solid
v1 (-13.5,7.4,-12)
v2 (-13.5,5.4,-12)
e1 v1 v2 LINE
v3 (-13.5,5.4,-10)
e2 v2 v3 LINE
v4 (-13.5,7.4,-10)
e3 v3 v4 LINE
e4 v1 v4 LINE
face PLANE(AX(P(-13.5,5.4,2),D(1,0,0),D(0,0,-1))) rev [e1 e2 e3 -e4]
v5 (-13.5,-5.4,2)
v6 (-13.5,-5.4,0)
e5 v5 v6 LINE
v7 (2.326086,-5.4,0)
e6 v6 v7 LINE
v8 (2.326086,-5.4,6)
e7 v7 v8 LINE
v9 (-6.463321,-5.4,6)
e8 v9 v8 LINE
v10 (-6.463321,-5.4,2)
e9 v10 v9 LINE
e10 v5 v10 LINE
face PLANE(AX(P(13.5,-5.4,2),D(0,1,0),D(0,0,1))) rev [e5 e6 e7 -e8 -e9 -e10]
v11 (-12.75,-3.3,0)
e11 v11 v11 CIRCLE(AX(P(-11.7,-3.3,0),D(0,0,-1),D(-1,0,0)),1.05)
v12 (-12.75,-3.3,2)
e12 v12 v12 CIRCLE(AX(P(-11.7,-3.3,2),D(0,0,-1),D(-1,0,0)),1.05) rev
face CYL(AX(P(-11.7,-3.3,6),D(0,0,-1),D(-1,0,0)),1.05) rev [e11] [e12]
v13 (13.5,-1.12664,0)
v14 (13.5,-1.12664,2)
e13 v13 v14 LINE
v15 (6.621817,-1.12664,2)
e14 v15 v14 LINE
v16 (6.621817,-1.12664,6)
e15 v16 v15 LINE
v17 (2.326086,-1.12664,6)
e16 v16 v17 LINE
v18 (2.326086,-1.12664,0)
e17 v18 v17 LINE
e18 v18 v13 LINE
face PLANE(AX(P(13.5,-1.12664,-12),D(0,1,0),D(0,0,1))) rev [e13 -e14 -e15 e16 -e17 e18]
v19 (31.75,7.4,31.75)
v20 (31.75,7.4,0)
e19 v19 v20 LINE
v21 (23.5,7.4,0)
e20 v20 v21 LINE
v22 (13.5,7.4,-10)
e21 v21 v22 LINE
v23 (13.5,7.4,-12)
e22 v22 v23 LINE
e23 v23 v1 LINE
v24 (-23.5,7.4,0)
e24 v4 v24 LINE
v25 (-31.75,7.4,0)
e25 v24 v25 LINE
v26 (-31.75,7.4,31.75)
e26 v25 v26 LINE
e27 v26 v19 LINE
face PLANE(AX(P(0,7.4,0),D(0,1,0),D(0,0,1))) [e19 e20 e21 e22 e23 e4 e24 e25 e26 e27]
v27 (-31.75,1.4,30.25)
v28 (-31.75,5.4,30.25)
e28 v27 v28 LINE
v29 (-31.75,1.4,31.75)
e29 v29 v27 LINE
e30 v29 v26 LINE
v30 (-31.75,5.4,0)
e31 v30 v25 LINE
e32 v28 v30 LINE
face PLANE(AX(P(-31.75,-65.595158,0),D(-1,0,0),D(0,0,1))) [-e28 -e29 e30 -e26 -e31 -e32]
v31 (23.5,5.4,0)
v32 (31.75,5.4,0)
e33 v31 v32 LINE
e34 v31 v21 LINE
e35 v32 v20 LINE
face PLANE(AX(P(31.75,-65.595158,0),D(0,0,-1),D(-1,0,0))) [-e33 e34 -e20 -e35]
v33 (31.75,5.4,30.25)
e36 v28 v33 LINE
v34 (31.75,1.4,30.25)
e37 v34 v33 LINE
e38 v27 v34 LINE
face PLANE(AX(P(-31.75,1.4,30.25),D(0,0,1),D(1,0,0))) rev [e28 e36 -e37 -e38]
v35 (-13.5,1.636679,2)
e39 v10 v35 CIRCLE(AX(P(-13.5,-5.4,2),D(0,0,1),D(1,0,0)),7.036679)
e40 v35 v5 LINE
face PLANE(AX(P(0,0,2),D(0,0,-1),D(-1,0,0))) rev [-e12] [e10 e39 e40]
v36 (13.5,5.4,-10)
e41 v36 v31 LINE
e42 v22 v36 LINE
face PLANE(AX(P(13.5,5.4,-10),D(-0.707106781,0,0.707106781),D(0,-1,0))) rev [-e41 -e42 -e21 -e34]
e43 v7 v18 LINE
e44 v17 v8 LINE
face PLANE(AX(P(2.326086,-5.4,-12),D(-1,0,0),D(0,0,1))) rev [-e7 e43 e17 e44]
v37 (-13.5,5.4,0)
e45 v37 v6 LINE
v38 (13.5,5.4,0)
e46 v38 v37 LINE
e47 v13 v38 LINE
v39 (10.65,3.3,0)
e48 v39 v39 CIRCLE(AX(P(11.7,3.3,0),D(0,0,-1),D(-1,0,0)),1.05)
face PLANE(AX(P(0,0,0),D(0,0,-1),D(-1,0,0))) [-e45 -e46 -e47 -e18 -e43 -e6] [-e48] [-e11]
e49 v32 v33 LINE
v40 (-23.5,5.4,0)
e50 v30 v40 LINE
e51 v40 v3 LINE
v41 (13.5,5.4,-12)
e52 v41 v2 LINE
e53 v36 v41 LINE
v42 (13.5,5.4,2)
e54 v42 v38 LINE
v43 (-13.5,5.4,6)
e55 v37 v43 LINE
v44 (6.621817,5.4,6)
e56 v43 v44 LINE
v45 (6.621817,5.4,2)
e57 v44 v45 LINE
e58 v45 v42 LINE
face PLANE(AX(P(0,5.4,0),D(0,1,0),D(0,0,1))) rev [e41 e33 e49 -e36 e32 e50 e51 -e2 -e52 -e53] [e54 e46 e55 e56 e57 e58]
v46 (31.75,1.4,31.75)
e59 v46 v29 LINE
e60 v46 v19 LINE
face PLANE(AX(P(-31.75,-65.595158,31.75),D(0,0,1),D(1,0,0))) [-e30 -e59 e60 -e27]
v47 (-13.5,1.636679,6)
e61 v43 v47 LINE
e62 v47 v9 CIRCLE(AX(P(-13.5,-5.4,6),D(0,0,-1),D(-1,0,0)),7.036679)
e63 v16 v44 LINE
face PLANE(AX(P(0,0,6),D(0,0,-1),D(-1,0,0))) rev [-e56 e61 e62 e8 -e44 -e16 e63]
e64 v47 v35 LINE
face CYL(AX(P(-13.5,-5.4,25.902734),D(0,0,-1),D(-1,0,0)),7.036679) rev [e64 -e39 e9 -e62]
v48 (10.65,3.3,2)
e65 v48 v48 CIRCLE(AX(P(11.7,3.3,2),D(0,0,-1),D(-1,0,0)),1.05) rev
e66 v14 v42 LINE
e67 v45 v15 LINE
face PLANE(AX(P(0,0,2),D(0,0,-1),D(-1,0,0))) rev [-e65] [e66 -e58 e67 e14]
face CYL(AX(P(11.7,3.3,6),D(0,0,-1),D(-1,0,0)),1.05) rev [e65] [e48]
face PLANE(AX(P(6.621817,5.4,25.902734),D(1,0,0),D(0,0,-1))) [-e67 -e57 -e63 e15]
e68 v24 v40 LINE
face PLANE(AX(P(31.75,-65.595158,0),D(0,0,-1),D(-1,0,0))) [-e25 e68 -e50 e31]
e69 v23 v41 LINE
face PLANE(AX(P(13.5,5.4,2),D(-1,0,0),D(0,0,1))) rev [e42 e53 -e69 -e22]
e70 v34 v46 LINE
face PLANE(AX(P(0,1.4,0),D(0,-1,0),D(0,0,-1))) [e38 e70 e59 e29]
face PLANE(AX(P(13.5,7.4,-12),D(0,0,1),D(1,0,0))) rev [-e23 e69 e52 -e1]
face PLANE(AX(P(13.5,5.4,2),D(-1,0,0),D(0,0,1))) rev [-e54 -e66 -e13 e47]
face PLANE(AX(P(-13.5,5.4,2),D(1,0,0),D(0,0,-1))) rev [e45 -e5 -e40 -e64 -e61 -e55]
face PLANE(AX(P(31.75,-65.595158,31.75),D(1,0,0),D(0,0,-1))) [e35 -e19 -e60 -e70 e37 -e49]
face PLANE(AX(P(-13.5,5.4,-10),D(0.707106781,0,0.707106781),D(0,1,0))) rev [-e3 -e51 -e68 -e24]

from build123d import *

# Parameters (mm, degrees)
SKETCH1_W           = 27
SKETCH1_H           = 10.8
BOSS_EXTRUDE1_DEPTH = 2
SKETCH2_W           = 27
SKETCH2_H           = 14
BOSS_EXTRUDE2_DEPTH = 2
SKETCH4_W           = 27
SKETCH4_H           = 12.8
BOSS_EXTRUDE3_DEPTH = 4
SKETCH6_W           = 11.173913912
SKETCH6_H           = 4.273360264
CUT_EXTRUDE1_DEPTH  = 24.685649664
SKETCH7_R           = 1.05
CUT_EXTRUDE2_DEPTH  = 20.519477452
SKETCH8_W           = 4.220493503
SKETCH8_H           = 6.690229829
CUT_EXTRUDE3_DEPTH  = 4
SKETCH9_W           = 4.8014854
SKETCH9_H           = 5.143985731
CUT_EXTRUDE4_DEPTH  = 4
SKETCH10_W          = 63.5
SKETCH10_H          = 31.75
BOSS_EXTRUDE5_DEPTH = 2
SKETCH11_R          = 7.036678993
SKETCH11_W          = 2.657689319
SKETCH11_H          = 6.526639736
CUT_EXTRUDE5_DEPTH  = 4
CHAMFER1_SIZE       = 10
SKETCH12_W          = 63.5
SKETCH12_H          = 1.5
BOSS_EXTRUDE6_DEPTH = 4


with BuildPart() as part:
    # Sketch1 → Boss-Extrude1 (new body)
    with BuildSketch(Plane.XY):
        Rectangle(SKETCH1_W, SKETCH1_H)
    extrude(amount=BOSS_EXTRUDE1_DEPTH)

    # Sketch2 → Boss-Extrude2 (add)
    with BuildSketch(Plane(origin=(0, 5.4, 0), x_dir=(1, 0, 0), z_dir=(0, 1, 0))):
        with Locations((0, 5)):
            Rectangle(SKETCH2_W, SKETCH2_H)
    extrude(amount=BOSS_EXTRUDE2_DEPTH)

    # Sketch4 → Boss-Extrude3 (add)
    with BuildSketch(Plane.XY.offset(2)):
        with Locations((0, 1)):
            Rectangle(SKETCH4_W, SKETCH4_H)
    extrude(amount=BOSS_EXTRUDE3_DEPTH)

    # Sketch6 → Cut-Extrude1 (cut, through all)
    with BuildSketch(Plane.XY.offset(6)):
        with Locations((7.913043044, -3.263319868)):
            Rectangle(SKETCH6_W, SKETCH6_H)
    extrude(amount=-CUT_EXTRUDE1_DEPTH, mode=Mode.SUBTRACT)

    # Sketch7 → Cut-Extrude2 (cut, through all)
    with BuildSketch(Plane(origin=(0, 0, 0), x_dir=(-1, 0, 0), z_dir=(0, 0, -1))):
        with Locations((11.7, -3.3)):
            Circle(SKETCH7_R)
        with Locations((-11.7, 3.3)):
            Circle(SKETCH7_R)
    extrude(amount=-CUT_EXTRUDE2_DEPTH, mode=Mode.SUBTRACT)

    # Sketch8 → Cut-Extrude3 (cut)
    with BuildSketch(Plane.XY.offset(6)):
        with Locations((11.389753248, 2.218475179)):
            Rectangle(SKETCH8_W, SKETCH8_H)
    extrude(amount=-CUT_EXTRUDE3_DEPTH, mode=Mode.SUBTRACT)

    # Sketch9 → Cut-Extrude4 (cut)
    with BuildSketch(Plane.XY.offset(6)):
        with Locations((-11.0992573, -2.828007134)):
            Rectangle(SKETCH9_W, SKETCH9_H)
    extrude(amount=-CUT_EXTRUDE4_DEPTH, mode=Mode.SUBTRACT)

    # Sketch10 → Boss-Extrude5 (add)
    with BuildSketch(Plane(origin=(0, 7.4, 0), x_dir=(1, 0, 0), z_dir=(0, 1, 0))):
        with Locations((0, -15.875)):
            Rectangle(SKETCH10_W, SKETCH10_H)
    extrude(amount=-BOSS_EXTRUDE5_DEPTH)

    # Sketch11 → Cut-Extrude5 (cut)
    with BuildSketch(Plane.XY.offset(2)):
        with Locations((-13.5, -5.4)):
            Circle(SKETCH11_R)
        with Locations((7.950661838, 2.136680132)):
            Rectangle(SKETCH11_W, SKETCH11_H)
    extrude(amount=CUT_EXTRUDE5_DEPTH, mode=Mode.SUBTRACT)

    # Chamfer1
    # the kernel refuses this chamfer: 10 mm, written as the material it adds along each edge
    with BuildSketch(Plane(origin=(-13.5, 5.4, 0), x_dir=(-0.9996219169112968, 0, 0.02749587661058648), z_dir=(0, 1, 0))) as chamfer1_piece_1:
        Polygon((CHAMFER1_SIZE * 0.999621916911, -CHAMFER1_SIZE * 0.0274958766106), (-CHAMFER1_SIZE * 0.0274958766106, -CHAMFER1_SIZE * 0.999621916911), (0, 0), align=None)
    extrude(amount=2)
    with BuildSketch(Plane(origin=(13.5, 7.4, 0), x_dir=(-0.027495876610586147, 0, -0.9996219169112968), z_dir=(0, -1, 0))) as chamfer1_piece_2:
        Polygon((CHAMFER1_SIZE * 0.999621916911, CHAMFER1_SIZE * 0.0274958766106), (-CHAMFER1_SIZE * 0.0274958766106, CHAMFER1_SIZE * 0.999621916911), (0, 0), align=None)
    extrude(amount=2)

    # Sketch12 → Boss-Extrude6 (add)
    with BuildSketch(Plane.XZ.offset(-5.4)):
        with Locations((0, 31)):
            Rectangle(SKETCH12_W, SKETCH12_H)
    extrude(amount=BOSS_EXTRUDE6_DEPTH)


solid = part.part
